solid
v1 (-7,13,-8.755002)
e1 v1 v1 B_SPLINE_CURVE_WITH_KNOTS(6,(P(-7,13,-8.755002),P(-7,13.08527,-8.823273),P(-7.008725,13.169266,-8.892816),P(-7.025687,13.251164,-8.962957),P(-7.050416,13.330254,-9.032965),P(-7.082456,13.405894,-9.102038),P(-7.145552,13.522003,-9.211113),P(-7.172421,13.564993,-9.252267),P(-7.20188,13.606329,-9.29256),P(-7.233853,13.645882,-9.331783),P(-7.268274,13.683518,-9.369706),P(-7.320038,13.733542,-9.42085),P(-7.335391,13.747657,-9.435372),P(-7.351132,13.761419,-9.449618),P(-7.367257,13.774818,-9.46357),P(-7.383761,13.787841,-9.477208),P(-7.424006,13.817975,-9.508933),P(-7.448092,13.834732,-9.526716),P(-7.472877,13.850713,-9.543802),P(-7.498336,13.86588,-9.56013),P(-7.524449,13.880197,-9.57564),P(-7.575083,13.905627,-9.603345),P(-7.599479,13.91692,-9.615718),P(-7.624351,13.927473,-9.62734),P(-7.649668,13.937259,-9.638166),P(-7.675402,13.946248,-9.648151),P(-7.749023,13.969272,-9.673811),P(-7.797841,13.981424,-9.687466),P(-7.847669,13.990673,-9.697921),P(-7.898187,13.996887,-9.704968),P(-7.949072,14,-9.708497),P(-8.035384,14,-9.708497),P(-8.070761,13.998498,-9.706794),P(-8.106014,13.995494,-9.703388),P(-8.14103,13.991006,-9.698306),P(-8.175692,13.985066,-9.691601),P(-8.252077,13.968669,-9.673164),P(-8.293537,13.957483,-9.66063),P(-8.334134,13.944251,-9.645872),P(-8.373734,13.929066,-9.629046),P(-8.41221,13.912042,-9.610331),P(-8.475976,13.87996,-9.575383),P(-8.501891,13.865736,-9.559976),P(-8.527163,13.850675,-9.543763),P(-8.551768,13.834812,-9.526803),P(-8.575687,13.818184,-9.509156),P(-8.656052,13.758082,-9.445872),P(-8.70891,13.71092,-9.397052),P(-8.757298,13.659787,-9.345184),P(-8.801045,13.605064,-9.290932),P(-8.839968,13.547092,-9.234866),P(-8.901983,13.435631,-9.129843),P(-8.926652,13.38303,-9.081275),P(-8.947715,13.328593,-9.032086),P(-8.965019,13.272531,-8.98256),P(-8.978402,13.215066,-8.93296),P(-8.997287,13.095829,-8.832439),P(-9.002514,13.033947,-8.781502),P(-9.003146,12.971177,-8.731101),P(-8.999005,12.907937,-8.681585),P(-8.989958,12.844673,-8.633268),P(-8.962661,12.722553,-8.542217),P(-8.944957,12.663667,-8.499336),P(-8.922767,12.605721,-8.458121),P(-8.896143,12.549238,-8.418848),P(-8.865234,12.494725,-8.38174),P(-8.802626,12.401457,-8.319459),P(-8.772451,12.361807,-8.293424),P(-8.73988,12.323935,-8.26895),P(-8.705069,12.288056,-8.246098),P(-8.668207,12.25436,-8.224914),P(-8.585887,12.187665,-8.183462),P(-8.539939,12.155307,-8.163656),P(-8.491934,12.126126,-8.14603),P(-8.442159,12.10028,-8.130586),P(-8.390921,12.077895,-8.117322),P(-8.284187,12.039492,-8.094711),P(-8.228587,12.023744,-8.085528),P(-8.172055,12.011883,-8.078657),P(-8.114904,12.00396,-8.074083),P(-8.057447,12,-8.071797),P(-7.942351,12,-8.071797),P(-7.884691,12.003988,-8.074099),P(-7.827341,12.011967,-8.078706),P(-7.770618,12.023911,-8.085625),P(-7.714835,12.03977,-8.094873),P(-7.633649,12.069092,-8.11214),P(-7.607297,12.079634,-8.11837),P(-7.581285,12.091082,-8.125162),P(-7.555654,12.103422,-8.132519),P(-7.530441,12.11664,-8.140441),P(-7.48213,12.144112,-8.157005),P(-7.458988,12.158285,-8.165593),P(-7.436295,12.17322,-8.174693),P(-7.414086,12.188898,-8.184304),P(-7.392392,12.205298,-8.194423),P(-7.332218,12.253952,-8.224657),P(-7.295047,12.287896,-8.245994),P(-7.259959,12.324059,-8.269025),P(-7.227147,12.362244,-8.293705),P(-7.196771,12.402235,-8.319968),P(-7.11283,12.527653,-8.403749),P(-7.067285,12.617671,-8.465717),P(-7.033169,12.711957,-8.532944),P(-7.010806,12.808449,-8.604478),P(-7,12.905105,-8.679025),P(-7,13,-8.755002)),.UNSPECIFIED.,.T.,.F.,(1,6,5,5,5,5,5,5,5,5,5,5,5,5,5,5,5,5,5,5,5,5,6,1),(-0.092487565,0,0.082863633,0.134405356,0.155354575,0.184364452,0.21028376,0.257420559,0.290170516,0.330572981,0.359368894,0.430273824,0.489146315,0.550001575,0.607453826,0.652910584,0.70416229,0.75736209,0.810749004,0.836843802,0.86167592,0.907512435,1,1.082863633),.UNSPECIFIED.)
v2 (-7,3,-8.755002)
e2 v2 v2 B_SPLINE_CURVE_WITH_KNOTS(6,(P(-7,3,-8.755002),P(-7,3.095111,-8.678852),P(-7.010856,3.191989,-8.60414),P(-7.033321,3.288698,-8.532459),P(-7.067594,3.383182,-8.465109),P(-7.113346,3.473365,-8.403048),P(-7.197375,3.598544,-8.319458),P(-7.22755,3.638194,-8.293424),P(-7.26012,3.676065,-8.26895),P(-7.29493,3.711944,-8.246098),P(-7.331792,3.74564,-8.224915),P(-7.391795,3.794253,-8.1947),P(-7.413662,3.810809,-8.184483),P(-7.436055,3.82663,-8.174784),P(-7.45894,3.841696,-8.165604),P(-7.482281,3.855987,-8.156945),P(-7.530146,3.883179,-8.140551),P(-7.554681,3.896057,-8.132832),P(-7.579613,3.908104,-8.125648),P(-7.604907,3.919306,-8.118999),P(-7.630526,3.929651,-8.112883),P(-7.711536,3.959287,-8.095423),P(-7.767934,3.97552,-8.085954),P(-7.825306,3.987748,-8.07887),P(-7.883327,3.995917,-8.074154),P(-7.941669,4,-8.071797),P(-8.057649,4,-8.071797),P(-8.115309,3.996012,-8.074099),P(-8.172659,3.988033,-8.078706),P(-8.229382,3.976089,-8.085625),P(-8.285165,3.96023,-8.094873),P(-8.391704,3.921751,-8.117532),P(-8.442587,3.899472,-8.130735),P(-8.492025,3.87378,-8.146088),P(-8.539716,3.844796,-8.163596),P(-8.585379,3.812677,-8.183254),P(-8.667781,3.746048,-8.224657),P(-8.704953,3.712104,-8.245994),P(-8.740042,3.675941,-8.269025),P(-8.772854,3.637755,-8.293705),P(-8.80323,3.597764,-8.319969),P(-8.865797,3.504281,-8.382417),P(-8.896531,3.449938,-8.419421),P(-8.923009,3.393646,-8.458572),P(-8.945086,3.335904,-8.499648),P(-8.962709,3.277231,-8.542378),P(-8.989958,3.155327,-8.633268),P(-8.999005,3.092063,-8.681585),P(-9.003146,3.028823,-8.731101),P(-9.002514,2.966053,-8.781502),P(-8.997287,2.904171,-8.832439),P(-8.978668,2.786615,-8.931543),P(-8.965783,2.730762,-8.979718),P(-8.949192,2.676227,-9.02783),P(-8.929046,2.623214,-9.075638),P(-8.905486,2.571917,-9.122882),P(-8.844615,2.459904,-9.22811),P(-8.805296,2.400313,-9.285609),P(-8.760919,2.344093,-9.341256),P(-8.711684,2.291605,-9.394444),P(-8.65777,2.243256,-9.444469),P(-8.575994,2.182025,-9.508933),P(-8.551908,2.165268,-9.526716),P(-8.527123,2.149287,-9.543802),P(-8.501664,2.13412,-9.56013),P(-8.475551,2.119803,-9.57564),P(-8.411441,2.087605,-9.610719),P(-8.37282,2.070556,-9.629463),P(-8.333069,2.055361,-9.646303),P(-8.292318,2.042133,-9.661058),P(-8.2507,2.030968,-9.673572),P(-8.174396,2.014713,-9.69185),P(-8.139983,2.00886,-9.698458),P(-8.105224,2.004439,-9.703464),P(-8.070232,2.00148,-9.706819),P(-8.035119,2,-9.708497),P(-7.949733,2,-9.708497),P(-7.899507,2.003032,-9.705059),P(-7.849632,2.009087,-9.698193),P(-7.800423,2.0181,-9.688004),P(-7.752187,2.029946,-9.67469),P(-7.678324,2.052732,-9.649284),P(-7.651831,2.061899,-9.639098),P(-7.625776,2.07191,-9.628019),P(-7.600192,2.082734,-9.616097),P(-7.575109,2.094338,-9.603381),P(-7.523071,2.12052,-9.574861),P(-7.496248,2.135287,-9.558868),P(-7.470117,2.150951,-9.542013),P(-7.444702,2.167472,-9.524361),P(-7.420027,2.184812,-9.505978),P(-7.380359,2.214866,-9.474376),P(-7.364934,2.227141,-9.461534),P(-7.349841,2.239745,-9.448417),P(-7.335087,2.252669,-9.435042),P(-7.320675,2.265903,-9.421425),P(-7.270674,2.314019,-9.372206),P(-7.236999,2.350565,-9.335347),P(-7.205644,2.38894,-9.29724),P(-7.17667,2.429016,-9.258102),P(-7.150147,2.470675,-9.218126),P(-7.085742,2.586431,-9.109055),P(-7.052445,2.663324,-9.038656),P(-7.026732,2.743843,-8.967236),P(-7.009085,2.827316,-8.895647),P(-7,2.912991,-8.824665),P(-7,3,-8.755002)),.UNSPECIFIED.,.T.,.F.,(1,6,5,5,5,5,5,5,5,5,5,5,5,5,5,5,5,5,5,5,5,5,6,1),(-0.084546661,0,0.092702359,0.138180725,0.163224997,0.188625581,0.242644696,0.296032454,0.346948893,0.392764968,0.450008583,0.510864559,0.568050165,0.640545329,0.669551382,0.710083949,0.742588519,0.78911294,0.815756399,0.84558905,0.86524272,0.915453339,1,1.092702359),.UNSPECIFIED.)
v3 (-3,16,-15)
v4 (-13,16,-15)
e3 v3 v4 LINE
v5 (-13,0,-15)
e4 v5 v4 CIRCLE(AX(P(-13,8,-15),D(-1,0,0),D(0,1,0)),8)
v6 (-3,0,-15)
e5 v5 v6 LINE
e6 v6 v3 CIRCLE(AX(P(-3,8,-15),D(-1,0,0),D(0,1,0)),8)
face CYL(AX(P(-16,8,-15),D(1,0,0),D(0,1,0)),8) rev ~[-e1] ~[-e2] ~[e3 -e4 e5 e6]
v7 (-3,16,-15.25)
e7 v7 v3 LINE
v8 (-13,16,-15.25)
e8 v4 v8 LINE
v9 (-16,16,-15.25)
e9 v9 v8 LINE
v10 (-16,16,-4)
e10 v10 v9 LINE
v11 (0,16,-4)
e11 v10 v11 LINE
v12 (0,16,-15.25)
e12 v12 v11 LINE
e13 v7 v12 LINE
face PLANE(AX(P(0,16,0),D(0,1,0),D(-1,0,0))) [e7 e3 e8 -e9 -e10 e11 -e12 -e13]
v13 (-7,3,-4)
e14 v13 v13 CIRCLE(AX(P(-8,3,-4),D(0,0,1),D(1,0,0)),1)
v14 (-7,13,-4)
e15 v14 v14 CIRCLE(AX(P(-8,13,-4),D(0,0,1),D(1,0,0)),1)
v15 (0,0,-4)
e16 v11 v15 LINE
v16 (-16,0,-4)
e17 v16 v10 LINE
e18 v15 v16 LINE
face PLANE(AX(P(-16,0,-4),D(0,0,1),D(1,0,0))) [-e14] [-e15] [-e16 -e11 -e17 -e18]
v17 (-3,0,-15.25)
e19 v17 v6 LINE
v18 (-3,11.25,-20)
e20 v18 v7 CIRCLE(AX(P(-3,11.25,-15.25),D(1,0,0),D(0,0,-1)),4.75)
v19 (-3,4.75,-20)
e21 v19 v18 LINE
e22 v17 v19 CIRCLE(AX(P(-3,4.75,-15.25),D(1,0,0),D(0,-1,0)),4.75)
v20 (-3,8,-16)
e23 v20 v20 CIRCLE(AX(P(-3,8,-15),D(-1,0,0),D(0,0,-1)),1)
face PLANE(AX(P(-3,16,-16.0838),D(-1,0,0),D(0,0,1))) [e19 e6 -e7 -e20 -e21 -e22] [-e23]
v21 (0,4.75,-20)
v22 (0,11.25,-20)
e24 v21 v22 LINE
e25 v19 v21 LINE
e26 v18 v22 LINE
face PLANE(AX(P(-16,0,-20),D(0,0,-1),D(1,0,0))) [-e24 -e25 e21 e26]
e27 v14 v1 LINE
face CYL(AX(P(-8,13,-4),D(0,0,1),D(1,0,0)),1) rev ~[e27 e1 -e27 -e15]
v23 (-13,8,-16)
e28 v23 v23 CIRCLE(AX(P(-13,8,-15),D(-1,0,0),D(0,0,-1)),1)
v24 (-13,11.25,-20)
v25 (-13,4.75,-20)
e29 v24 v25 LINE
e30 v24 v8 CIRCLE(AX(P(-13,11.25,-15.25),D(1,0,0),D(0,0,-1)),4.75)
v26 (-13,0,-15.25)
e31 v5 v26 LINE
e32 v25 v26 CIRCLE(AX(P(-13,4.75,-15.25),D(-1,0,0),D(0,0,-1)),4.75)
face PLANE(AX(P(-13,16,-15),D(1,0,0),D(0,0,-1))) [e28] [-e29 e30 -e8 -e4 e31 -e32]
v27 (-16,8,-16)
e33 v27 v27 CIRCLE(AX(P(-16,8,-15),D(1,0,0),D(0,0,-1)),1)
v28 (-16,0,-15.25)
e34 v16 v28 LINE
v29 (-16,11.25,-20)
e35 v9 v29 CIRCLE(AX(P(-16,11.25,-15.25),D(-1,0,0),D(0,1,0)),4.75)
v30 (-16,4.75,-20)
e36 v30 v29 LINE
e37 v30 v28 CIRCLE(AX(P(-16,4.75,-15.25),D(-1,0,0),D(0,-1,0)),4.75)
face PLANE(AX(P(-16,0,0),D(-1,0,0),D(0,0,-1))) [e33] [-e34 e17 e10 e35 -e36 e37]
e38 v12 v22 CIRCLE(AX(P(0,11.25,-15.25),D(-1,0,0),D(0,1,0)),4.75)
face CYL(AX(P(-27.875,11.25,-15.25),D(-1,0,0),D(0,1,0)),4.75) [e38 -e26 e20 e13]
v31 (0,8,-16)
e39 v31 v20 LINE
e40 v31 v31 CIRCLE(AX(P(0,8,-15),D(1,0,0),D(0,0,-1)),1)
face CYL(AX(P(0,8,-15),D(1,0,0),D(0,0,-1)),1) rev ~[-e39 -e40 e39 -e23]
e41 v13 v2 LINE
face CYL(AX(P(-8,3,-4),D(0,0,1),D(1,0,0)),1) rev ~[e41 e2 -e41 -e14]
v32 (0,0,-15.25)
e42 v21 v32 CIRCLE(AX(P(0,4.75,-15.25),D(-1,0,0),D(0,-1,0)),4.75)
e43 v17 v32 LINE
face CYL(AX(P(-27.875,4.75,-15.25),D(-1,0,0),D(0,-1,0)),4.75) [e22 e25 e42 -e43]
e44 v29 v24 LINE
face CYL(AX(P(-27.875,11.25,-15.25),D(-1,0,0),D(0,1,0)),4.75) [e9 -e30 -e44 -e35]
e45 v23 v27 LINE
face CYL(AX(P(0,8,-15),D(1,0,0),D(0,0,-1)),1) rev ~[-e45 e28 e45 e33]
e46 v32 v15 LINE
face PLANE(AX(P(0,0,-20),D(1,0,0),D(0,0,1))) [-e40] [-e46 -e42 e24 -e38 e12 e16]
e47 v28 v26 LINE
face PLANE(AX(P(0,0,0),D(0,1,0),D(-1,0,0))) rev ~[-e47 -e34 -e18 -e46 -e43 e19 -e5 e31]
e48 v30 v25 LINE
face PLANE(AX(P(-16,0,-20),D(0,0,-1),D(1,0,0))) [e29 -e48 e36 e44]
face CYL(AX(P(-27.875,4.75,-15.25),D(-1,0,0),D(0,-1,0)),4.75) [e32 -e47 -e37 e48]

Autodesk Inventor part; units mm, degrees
ref_plane "YZ Plane" through (0, 0, 0) normal (1, 0, 0) x (0, 1, 0)
ref_plane "XZ Plane" through (0, 0, 0) normal (0, 1, 0) x (-1, 0, 0)
sketch "Sketch1" plane through (0, 0, 0) normal (0, 1, 0) x (-1, 0, 0)
  line L0 (0, 0) -> (16, 0)
  line L1 (16, 0) -> (16, -20)
  line L2 (16, -20) -> (0, -20)
  line L3 (0, -20) -> (0, 0)
  dimension "d0" = 16
  dimension "d1" = 20
extrude "Extrusion1" add sketch "Sketch1" along normal blind 16
ref_plane "Work Plane1" through (0, 0, -15) normal (0, 0, -1) x (-1, 0, 0)
sketch "Sketch2" plane through (0, 0, -15) normal (0, 0, -1) x (-1, 0, 0)
  line L0 (16, 16) -> (0, 16) projected
  line L1 (8, 16) -> (3, 16)
  line L2 (3, 16) -> (13, 16)
  line L3 (0, 0) -> (0, 16) projected
  line L4 (0, 8) -> (3, 8)
  line L5 (3, 8) -> (13, 8)
  line L6 (13, 8) -> (13, 16)
  line L7 (13, 16) -> (3, 16)
  line L8 (3, 16) -> (3, 8)
  dimension "d5" = 5
revolve "Revolution1" cut sketch "Sketch2" angle 360 about axis through (-3, 8, -15) along (-1, 0, 0) contours L6 L5 L8 L0
fillet "Fillet1" radius 4.75 4 edges at (-8, 14.245, -20) (-8, 1.755, -20) (-8, 16, -20) (-8, 0, -20)
sketch "Sketch3" plane through (-16, 0, 0) normal (0, 0, 1) x (1, 0, 0)
  line L0 (0, 16) -> (16, 16) projected
  line L1 (0, 16) -> (16, 16)
  line L2 (16, 16) -> (16, 0)
  line L3 (16, 0) -> (0, 0)
  line L4 (0, 0) -> (0, 16)
extrude "Extrusion2" cut sketch "Sketch3" against normal blind 4
sketch "Sketch4" plane through (0, 4.75, -20) normal (1, 0, 0) x (0, 0, -1)
  arc A0 (-5, 11.25) -> (-5, -4.75) centre (-5, 3.25) ccw projected
  circle A1 centre (-5, 3.25) radius 1
  point P0 (-20, -4.75)
  dimension "d12" = 2
extrude "Extrusion3" cut sketch "Sketch4" against normal up to surface (16 mm away)
sketch "Sketch5" plane through (-16, 0, -4) normal (0, 0, 1) x (1, 0, 0)
  line L0 (0, 16) -> (16, 16) projected
  circle A0 centre (8, 3) radius 1
  circle A1 centre (8, 13) radius 1
  point P0 (16, 0)
  dimension "d16" = 2
extrude "Extrusion4" cut sketch "Sketch5" against normal blind 10
sketch "Sketch6" plane through (0, 16, 0) normal (0, 1, 0) x (1, 0, 0)
  line L0 (-13, 15) -> (-3, 15) projected
  line L1 (-13, 16.0838) -> (-3, 16.0838) projected
  line L2 (-3, 15) -> (-13, 15)
  line L3 (-13, 15) -> (-13, 16.0838)
  line L4 (-13, 16.0838) -> (-3, 16.0838)
  line L5 (-3, 16.0838) -> (-3, 15)
  point P0 (0, 0)
extrude "Extrusion5" cut sketch "Sketch6" against normal up to surface (16 mm away)
properties part number "Bearing_Holder"
